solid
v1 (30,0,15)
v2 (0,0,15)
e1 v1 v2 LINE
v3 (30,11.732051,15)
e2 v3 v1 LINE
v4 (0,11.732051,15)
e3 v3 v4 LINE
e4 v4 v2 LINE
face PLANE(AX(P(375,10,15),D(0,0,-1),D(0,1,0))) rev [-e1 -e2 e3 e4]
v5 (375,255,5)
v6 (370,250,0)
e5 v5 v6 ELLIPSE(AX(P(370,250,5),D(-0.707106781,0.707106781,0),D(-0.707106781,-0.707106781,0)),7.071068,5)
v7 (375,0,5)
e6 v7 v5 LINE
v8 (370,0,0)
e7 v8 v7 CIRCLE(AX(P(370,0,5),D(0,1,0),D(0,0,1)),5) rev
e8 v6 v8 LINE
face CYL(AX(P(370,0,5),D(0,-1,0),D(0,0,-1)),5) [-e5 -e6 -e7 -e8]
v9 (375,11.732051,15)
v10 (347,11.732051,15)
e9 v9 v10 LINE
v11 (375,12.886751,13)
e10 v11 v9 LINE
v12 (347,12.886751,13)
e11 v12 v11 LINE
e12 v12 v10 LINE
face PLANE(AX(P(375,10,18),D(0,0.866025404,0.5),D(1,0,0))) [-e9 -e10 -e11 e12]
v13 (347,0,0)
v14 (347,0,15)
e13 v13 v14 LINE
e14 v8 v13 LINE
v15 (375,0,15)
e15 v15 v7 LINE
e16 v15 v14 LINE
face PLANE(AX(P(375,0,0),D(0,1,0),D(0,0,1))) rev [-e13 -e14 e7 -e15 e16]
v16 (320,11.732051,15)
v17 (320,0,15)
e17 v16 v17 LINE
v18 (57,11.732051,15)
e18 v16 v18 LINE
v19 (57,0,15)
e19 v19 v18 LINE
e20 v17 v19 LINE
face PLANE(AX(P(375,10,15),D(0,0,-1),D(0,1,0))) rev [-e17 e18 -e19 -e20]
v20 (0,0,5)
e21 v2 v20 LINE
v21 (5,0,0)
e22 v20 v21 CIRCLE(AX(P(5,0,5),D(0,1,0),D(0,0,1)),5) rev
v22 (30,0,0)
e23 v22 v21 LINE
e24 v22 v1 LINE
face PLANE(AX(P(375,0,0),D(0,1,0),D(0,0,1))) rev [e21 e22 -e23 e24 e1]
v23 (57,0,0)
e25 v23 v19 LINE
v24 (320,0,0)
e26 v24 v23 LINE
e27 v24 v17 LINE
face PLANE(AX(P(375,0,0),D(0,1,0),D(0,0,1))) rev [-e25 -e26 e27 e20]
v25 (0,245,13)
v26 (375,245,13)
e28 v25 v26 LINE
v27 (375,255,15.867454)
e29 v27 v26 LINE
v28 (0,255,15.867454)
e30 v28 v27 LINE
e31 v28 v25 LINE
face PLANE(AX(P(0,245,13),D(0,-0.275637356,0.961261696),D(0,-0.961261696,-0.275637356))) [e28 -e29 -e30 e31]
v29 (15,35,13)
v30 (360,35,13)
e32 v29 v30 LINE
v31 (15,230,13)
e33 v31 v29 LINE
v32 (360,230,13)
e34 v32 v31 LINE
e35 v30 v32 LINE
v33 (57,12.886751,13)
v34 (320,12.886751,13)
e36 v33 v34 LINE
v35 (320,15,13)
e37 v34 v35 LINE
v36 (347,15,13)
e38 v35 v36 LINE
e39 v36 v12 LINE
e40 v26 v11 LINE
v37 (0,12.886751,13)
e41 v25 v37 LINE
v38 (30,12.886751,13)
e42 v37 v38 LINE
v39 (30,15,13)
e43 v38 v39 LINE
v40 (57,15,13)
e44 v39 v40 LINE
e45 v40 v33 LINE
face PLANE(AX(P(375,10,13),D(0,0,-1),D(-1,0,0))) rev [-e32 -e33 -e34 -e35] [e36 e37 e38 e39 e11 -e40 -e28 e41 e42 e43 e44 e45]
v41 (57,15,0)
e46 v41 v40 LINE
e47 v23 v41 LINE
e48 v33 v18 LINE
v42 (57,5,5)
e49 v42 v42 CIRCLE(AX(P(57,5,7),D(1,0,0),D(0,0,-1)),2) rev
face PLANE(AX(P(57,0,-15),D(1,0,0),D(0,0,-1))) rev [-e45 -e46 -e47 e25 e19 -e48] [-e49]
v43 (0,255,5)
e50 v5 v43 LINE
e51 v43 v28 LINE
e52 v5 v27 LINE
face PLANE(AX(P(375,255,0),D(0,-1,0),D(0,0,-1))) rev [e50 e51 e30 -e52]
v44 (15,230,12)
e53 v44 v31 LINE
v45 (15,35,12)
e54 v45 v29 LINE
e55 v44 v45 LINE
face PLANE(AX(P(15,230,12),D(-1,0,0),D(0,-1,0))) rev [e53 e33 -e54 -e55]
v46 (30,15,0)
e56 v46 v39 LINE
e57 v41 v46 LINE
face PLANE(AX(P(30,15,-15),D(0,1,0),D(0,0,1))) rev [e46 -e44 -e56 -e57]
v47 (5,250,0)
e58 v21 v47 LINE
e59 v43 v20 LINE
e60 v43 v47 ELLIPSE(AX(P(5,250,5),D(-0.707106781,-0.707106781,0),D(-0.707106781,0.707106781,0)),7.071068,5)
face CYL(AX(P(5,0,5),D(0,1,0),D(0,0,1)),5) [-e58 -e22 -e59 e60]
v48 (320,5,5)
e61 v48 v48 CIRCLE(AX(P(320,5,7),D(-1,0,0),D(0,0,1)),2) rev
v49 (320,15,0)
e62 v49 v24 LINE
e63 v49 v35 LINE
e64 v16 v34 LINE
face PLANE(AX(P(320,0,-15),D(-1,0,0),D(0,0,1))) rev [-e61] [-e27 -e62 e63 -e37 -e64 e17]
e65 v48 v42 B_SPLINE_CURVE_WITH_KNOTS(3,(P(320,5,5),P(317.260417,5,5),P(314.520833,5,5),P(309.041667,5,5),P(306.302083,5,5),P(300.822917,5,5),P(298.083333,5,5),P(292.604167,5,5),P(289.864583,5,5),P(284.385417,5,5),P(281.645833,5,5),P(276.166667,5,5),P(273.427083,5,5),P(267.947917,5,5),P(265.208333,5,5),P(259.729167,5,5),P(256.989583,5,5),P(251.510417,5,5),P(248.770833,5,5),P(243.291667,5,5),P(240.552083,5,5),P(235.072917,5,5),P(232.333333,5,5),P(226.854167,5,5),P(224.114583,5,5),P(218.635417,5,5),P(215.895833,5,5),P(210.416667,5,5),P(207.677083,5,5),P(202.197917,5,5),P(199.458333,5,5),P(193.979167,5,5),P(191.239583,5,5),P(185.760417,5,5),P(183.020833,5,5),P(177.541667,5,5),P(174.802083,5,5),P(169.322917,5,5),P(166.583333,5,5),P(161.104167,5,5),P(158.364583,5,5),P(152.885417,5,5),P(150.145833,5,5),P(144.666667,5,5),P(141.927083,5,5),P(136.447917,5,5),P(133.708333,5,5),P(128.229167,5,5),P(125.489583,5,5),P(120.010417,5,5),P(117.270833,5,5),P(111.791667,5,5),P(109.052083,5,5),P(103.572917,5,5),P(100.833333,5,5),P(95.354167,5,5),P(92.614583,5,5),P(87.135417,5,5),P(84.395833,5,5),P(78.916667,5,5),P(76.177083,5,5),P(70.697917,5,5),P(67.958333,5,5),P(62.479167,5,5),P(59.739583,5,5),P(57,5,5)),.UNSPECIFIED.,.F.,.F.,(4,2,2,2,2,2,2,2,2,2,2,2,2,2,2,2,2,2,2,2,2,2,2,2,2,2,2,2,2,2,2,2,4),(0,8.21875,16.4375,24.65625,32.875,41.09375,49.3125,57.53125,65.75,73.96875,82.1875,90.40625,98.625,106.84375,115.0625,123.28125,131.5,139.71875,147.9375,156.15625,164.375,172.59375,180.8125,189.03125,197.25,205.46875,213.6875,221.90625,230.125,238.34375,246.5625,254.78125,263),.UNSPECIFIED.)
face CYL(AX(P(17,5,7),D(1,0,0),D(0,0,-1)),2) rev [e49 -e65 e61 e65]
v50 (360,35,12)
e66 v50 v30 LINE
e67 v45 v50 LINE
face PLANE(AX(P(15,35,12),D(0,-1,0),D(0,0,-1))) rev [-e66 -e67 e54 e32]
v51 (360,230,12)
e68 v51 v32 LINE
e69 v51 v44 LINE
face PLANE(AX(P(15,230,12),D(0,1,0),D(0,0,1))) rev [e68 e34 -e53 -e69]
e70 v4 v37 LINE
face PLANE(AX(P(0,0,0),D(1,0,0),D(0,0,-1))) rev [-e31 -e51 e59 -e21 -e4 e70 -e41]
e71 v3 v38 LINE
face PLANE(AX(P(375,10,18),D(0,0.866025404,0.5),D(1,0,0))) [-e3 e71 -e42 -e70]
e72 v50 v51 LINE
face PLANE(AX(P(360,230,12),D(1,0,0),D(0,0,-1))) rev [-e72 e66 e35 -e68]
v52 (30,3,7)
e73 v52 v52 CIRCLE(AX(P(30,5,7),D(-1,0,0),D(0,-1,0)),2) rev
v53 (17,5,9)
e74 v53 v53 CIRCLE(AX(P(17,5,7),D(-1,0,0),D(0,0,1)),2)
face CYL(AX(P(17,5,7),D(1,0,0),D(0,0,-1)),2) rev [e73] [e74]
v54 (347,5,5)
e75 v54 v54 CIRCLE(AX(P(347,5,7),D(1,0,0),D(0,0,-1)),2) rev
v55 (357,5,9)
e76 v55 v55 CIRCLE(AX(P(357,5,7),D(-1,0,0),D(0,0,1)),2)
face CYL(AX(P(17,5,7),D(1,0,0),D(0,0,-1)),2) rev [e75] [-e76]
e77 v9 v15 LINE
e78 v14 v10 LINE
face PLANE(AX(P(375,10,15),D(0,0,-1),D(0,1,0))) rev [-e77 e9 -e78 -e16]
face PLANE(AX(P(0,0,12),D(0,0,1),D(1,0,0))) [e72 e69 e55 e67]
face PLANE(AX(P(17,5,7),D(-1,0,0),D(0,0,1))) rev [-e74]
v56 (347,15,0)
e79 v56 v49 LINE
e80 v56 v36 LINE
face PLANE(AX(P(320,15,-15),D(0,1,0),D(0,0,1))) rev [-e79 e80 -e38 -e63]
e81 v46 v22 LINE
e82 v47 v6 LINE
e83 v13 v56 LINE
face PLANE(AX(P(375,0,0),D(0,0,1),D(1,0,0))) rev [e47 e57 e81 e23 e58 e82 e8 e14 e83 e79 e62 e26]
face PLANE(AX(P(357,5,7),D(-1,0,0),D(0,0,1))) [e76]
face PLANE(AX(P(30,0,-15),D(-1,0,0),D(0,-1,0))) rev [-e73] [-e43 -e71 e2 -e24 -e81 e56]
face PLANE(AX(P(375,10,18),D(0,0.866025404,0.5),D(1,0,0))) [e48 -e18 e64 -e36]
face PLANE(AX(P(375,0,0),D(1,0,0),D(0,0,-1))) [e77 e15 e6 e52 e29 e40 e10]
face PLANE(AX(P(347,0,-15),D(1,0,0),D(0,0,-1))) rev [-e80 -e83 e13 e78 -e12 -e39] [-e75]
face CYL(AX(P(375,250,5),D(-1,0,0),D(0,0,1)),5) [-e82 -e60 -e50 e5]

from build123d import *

# Parameters (mm, degrees)
BOSS_EXTRUDE1_DEPTH     = 375
SKETCH2_W               = 345
SKETCH2_H               = 195
CUT_EXTRUDE1_DEPTH      = 1
CHAMFER1_SIZE           = 5
CHAMFER1_SIZE_2         = 2.886751346
SKETCH3_W               = 27
SKETCH3_H               = 15
CUT_EXTRUDE2_DEPTH      = 30
CUT_EXTRUDE3_DEPTH      = 40
CUT_EXTRUDE3_DEPTH_BACK = 300
SKETCH4_R               = 2
BOSS_EXTRUDE2_DEPTH     = 375
FILLET1_R               = 5


with BuildPart() as part:
    # Sketch1 → Boss-Extrude1 (new body)
    with BuildSketch(Plane(origin=(0, 0, 0), x_dir=(0, 0, -1), z_dir=(1, 0, 0))):
        Polygon((0, 0), (-13, 0), (-15, 0), (-15, 10), (-13, 10), (-13, 255), (0, 255), align=None)
    extrude(amount=BOSS_EXTRUDE1_DEPTH)

    # Sketch2 → Cut-Extrude1 (cut)
    with BuildSketch(Plane.XY.offset(13)):
        with Locations((187.5, 132.5)):
            Rectangle(SKETCH2_W, SKETCH2_H)
    extrude(amount=-CUT_EXTRUDE1_DEPTH, mode=Mode.SUBTRACT)

    # Chamfer1
    # the kernel refuses this chamfer: 5, 2.886751346 mm, written as the material it adds along each edge
    with BuildSketch(Plane(origin=(0, 10, 13), x_dir=(0, -0.01932676561270064, 0.9998132206222079), z_dir=(1, 0, 0))) as chamfer1_piece_1_section:
        Polygon((CHAMFER1_SIZE * 0.999813220622, -CHAMFER1_SIZE * 0.0193267656127), (-CHAMFER1_SIZE_2 * 0.0193267656124, -CHAMFER1_SIZE_2 * 0.999813220604), (0, 0), align=None)
    chamfer1_piece_1 = extrude(amount=375, mode=Mode.PRIVATE)
    chamfer1_piece_1 = split(chamfer1_piece_1, bisect_by=Plane(origin=(187.5, 11.179939158, 15), z_dir=(0, 0, -1)), keep=Keep.TOP, mode=Mode.PRIVATE)
    add(chamfer1_piece_1)

    # Sketch3 → Cut-Extrude2 (cut)
    with BuildSketch(Plane.XY.offset(15)):
        with Locations((43.5, 7.5)):
            Rectangle(SKETCH3_W, SKETCH3_H)
        with Locations((333.5, 7.5)):
            Rectangle(SKETCH3_W, SKETCH3_H)
    extrude(amount=-CUT_EXTRUDE2_DEPTH, mode=Mode.SUBTRACT)

    # Sketch4 → Cut-Extrude3 (cut, two sides: drawn at the far end of the back side and taken through both)
    with BuildSketch(Plane.ZY.offset(-57).offset(-CUT_EXTRUDE3_DEPTH_BACK)):
        with Locations(Location((7, 5, 0), (0, 0, 180))):
            Circle(SKETCH4_R)
    extrude(amount=CUT_EXTRUDE3_DEPTH + CUT_EXTRUDE3_DEPTH_BACK, mode=Mode.SUBTRACT)

    # Sketch5 → Boss-Extrude2 (add)
    with BuildSketch(Plane(origin=(375, 0, 0), x_dir=(0, 0, -1), z_dir=(1, 0, 0))):
        Polygon((-13, 245), (-15.867453858, 255), (-13, 255), align=None)
    extrude(amount=-BOSS_EXTRUDE2_DEPTH)

    # Fillet1
    fillet1_edges = [part.edges().sort_by_distance(p)[0] for p in [
        (187.5, 255, 0),
        (375, 127.5, 0),
        (0, 127.5, 0),
    ]]
    fillet(fillet1_edges, radius=FILLET1_R)


solid = part.part
